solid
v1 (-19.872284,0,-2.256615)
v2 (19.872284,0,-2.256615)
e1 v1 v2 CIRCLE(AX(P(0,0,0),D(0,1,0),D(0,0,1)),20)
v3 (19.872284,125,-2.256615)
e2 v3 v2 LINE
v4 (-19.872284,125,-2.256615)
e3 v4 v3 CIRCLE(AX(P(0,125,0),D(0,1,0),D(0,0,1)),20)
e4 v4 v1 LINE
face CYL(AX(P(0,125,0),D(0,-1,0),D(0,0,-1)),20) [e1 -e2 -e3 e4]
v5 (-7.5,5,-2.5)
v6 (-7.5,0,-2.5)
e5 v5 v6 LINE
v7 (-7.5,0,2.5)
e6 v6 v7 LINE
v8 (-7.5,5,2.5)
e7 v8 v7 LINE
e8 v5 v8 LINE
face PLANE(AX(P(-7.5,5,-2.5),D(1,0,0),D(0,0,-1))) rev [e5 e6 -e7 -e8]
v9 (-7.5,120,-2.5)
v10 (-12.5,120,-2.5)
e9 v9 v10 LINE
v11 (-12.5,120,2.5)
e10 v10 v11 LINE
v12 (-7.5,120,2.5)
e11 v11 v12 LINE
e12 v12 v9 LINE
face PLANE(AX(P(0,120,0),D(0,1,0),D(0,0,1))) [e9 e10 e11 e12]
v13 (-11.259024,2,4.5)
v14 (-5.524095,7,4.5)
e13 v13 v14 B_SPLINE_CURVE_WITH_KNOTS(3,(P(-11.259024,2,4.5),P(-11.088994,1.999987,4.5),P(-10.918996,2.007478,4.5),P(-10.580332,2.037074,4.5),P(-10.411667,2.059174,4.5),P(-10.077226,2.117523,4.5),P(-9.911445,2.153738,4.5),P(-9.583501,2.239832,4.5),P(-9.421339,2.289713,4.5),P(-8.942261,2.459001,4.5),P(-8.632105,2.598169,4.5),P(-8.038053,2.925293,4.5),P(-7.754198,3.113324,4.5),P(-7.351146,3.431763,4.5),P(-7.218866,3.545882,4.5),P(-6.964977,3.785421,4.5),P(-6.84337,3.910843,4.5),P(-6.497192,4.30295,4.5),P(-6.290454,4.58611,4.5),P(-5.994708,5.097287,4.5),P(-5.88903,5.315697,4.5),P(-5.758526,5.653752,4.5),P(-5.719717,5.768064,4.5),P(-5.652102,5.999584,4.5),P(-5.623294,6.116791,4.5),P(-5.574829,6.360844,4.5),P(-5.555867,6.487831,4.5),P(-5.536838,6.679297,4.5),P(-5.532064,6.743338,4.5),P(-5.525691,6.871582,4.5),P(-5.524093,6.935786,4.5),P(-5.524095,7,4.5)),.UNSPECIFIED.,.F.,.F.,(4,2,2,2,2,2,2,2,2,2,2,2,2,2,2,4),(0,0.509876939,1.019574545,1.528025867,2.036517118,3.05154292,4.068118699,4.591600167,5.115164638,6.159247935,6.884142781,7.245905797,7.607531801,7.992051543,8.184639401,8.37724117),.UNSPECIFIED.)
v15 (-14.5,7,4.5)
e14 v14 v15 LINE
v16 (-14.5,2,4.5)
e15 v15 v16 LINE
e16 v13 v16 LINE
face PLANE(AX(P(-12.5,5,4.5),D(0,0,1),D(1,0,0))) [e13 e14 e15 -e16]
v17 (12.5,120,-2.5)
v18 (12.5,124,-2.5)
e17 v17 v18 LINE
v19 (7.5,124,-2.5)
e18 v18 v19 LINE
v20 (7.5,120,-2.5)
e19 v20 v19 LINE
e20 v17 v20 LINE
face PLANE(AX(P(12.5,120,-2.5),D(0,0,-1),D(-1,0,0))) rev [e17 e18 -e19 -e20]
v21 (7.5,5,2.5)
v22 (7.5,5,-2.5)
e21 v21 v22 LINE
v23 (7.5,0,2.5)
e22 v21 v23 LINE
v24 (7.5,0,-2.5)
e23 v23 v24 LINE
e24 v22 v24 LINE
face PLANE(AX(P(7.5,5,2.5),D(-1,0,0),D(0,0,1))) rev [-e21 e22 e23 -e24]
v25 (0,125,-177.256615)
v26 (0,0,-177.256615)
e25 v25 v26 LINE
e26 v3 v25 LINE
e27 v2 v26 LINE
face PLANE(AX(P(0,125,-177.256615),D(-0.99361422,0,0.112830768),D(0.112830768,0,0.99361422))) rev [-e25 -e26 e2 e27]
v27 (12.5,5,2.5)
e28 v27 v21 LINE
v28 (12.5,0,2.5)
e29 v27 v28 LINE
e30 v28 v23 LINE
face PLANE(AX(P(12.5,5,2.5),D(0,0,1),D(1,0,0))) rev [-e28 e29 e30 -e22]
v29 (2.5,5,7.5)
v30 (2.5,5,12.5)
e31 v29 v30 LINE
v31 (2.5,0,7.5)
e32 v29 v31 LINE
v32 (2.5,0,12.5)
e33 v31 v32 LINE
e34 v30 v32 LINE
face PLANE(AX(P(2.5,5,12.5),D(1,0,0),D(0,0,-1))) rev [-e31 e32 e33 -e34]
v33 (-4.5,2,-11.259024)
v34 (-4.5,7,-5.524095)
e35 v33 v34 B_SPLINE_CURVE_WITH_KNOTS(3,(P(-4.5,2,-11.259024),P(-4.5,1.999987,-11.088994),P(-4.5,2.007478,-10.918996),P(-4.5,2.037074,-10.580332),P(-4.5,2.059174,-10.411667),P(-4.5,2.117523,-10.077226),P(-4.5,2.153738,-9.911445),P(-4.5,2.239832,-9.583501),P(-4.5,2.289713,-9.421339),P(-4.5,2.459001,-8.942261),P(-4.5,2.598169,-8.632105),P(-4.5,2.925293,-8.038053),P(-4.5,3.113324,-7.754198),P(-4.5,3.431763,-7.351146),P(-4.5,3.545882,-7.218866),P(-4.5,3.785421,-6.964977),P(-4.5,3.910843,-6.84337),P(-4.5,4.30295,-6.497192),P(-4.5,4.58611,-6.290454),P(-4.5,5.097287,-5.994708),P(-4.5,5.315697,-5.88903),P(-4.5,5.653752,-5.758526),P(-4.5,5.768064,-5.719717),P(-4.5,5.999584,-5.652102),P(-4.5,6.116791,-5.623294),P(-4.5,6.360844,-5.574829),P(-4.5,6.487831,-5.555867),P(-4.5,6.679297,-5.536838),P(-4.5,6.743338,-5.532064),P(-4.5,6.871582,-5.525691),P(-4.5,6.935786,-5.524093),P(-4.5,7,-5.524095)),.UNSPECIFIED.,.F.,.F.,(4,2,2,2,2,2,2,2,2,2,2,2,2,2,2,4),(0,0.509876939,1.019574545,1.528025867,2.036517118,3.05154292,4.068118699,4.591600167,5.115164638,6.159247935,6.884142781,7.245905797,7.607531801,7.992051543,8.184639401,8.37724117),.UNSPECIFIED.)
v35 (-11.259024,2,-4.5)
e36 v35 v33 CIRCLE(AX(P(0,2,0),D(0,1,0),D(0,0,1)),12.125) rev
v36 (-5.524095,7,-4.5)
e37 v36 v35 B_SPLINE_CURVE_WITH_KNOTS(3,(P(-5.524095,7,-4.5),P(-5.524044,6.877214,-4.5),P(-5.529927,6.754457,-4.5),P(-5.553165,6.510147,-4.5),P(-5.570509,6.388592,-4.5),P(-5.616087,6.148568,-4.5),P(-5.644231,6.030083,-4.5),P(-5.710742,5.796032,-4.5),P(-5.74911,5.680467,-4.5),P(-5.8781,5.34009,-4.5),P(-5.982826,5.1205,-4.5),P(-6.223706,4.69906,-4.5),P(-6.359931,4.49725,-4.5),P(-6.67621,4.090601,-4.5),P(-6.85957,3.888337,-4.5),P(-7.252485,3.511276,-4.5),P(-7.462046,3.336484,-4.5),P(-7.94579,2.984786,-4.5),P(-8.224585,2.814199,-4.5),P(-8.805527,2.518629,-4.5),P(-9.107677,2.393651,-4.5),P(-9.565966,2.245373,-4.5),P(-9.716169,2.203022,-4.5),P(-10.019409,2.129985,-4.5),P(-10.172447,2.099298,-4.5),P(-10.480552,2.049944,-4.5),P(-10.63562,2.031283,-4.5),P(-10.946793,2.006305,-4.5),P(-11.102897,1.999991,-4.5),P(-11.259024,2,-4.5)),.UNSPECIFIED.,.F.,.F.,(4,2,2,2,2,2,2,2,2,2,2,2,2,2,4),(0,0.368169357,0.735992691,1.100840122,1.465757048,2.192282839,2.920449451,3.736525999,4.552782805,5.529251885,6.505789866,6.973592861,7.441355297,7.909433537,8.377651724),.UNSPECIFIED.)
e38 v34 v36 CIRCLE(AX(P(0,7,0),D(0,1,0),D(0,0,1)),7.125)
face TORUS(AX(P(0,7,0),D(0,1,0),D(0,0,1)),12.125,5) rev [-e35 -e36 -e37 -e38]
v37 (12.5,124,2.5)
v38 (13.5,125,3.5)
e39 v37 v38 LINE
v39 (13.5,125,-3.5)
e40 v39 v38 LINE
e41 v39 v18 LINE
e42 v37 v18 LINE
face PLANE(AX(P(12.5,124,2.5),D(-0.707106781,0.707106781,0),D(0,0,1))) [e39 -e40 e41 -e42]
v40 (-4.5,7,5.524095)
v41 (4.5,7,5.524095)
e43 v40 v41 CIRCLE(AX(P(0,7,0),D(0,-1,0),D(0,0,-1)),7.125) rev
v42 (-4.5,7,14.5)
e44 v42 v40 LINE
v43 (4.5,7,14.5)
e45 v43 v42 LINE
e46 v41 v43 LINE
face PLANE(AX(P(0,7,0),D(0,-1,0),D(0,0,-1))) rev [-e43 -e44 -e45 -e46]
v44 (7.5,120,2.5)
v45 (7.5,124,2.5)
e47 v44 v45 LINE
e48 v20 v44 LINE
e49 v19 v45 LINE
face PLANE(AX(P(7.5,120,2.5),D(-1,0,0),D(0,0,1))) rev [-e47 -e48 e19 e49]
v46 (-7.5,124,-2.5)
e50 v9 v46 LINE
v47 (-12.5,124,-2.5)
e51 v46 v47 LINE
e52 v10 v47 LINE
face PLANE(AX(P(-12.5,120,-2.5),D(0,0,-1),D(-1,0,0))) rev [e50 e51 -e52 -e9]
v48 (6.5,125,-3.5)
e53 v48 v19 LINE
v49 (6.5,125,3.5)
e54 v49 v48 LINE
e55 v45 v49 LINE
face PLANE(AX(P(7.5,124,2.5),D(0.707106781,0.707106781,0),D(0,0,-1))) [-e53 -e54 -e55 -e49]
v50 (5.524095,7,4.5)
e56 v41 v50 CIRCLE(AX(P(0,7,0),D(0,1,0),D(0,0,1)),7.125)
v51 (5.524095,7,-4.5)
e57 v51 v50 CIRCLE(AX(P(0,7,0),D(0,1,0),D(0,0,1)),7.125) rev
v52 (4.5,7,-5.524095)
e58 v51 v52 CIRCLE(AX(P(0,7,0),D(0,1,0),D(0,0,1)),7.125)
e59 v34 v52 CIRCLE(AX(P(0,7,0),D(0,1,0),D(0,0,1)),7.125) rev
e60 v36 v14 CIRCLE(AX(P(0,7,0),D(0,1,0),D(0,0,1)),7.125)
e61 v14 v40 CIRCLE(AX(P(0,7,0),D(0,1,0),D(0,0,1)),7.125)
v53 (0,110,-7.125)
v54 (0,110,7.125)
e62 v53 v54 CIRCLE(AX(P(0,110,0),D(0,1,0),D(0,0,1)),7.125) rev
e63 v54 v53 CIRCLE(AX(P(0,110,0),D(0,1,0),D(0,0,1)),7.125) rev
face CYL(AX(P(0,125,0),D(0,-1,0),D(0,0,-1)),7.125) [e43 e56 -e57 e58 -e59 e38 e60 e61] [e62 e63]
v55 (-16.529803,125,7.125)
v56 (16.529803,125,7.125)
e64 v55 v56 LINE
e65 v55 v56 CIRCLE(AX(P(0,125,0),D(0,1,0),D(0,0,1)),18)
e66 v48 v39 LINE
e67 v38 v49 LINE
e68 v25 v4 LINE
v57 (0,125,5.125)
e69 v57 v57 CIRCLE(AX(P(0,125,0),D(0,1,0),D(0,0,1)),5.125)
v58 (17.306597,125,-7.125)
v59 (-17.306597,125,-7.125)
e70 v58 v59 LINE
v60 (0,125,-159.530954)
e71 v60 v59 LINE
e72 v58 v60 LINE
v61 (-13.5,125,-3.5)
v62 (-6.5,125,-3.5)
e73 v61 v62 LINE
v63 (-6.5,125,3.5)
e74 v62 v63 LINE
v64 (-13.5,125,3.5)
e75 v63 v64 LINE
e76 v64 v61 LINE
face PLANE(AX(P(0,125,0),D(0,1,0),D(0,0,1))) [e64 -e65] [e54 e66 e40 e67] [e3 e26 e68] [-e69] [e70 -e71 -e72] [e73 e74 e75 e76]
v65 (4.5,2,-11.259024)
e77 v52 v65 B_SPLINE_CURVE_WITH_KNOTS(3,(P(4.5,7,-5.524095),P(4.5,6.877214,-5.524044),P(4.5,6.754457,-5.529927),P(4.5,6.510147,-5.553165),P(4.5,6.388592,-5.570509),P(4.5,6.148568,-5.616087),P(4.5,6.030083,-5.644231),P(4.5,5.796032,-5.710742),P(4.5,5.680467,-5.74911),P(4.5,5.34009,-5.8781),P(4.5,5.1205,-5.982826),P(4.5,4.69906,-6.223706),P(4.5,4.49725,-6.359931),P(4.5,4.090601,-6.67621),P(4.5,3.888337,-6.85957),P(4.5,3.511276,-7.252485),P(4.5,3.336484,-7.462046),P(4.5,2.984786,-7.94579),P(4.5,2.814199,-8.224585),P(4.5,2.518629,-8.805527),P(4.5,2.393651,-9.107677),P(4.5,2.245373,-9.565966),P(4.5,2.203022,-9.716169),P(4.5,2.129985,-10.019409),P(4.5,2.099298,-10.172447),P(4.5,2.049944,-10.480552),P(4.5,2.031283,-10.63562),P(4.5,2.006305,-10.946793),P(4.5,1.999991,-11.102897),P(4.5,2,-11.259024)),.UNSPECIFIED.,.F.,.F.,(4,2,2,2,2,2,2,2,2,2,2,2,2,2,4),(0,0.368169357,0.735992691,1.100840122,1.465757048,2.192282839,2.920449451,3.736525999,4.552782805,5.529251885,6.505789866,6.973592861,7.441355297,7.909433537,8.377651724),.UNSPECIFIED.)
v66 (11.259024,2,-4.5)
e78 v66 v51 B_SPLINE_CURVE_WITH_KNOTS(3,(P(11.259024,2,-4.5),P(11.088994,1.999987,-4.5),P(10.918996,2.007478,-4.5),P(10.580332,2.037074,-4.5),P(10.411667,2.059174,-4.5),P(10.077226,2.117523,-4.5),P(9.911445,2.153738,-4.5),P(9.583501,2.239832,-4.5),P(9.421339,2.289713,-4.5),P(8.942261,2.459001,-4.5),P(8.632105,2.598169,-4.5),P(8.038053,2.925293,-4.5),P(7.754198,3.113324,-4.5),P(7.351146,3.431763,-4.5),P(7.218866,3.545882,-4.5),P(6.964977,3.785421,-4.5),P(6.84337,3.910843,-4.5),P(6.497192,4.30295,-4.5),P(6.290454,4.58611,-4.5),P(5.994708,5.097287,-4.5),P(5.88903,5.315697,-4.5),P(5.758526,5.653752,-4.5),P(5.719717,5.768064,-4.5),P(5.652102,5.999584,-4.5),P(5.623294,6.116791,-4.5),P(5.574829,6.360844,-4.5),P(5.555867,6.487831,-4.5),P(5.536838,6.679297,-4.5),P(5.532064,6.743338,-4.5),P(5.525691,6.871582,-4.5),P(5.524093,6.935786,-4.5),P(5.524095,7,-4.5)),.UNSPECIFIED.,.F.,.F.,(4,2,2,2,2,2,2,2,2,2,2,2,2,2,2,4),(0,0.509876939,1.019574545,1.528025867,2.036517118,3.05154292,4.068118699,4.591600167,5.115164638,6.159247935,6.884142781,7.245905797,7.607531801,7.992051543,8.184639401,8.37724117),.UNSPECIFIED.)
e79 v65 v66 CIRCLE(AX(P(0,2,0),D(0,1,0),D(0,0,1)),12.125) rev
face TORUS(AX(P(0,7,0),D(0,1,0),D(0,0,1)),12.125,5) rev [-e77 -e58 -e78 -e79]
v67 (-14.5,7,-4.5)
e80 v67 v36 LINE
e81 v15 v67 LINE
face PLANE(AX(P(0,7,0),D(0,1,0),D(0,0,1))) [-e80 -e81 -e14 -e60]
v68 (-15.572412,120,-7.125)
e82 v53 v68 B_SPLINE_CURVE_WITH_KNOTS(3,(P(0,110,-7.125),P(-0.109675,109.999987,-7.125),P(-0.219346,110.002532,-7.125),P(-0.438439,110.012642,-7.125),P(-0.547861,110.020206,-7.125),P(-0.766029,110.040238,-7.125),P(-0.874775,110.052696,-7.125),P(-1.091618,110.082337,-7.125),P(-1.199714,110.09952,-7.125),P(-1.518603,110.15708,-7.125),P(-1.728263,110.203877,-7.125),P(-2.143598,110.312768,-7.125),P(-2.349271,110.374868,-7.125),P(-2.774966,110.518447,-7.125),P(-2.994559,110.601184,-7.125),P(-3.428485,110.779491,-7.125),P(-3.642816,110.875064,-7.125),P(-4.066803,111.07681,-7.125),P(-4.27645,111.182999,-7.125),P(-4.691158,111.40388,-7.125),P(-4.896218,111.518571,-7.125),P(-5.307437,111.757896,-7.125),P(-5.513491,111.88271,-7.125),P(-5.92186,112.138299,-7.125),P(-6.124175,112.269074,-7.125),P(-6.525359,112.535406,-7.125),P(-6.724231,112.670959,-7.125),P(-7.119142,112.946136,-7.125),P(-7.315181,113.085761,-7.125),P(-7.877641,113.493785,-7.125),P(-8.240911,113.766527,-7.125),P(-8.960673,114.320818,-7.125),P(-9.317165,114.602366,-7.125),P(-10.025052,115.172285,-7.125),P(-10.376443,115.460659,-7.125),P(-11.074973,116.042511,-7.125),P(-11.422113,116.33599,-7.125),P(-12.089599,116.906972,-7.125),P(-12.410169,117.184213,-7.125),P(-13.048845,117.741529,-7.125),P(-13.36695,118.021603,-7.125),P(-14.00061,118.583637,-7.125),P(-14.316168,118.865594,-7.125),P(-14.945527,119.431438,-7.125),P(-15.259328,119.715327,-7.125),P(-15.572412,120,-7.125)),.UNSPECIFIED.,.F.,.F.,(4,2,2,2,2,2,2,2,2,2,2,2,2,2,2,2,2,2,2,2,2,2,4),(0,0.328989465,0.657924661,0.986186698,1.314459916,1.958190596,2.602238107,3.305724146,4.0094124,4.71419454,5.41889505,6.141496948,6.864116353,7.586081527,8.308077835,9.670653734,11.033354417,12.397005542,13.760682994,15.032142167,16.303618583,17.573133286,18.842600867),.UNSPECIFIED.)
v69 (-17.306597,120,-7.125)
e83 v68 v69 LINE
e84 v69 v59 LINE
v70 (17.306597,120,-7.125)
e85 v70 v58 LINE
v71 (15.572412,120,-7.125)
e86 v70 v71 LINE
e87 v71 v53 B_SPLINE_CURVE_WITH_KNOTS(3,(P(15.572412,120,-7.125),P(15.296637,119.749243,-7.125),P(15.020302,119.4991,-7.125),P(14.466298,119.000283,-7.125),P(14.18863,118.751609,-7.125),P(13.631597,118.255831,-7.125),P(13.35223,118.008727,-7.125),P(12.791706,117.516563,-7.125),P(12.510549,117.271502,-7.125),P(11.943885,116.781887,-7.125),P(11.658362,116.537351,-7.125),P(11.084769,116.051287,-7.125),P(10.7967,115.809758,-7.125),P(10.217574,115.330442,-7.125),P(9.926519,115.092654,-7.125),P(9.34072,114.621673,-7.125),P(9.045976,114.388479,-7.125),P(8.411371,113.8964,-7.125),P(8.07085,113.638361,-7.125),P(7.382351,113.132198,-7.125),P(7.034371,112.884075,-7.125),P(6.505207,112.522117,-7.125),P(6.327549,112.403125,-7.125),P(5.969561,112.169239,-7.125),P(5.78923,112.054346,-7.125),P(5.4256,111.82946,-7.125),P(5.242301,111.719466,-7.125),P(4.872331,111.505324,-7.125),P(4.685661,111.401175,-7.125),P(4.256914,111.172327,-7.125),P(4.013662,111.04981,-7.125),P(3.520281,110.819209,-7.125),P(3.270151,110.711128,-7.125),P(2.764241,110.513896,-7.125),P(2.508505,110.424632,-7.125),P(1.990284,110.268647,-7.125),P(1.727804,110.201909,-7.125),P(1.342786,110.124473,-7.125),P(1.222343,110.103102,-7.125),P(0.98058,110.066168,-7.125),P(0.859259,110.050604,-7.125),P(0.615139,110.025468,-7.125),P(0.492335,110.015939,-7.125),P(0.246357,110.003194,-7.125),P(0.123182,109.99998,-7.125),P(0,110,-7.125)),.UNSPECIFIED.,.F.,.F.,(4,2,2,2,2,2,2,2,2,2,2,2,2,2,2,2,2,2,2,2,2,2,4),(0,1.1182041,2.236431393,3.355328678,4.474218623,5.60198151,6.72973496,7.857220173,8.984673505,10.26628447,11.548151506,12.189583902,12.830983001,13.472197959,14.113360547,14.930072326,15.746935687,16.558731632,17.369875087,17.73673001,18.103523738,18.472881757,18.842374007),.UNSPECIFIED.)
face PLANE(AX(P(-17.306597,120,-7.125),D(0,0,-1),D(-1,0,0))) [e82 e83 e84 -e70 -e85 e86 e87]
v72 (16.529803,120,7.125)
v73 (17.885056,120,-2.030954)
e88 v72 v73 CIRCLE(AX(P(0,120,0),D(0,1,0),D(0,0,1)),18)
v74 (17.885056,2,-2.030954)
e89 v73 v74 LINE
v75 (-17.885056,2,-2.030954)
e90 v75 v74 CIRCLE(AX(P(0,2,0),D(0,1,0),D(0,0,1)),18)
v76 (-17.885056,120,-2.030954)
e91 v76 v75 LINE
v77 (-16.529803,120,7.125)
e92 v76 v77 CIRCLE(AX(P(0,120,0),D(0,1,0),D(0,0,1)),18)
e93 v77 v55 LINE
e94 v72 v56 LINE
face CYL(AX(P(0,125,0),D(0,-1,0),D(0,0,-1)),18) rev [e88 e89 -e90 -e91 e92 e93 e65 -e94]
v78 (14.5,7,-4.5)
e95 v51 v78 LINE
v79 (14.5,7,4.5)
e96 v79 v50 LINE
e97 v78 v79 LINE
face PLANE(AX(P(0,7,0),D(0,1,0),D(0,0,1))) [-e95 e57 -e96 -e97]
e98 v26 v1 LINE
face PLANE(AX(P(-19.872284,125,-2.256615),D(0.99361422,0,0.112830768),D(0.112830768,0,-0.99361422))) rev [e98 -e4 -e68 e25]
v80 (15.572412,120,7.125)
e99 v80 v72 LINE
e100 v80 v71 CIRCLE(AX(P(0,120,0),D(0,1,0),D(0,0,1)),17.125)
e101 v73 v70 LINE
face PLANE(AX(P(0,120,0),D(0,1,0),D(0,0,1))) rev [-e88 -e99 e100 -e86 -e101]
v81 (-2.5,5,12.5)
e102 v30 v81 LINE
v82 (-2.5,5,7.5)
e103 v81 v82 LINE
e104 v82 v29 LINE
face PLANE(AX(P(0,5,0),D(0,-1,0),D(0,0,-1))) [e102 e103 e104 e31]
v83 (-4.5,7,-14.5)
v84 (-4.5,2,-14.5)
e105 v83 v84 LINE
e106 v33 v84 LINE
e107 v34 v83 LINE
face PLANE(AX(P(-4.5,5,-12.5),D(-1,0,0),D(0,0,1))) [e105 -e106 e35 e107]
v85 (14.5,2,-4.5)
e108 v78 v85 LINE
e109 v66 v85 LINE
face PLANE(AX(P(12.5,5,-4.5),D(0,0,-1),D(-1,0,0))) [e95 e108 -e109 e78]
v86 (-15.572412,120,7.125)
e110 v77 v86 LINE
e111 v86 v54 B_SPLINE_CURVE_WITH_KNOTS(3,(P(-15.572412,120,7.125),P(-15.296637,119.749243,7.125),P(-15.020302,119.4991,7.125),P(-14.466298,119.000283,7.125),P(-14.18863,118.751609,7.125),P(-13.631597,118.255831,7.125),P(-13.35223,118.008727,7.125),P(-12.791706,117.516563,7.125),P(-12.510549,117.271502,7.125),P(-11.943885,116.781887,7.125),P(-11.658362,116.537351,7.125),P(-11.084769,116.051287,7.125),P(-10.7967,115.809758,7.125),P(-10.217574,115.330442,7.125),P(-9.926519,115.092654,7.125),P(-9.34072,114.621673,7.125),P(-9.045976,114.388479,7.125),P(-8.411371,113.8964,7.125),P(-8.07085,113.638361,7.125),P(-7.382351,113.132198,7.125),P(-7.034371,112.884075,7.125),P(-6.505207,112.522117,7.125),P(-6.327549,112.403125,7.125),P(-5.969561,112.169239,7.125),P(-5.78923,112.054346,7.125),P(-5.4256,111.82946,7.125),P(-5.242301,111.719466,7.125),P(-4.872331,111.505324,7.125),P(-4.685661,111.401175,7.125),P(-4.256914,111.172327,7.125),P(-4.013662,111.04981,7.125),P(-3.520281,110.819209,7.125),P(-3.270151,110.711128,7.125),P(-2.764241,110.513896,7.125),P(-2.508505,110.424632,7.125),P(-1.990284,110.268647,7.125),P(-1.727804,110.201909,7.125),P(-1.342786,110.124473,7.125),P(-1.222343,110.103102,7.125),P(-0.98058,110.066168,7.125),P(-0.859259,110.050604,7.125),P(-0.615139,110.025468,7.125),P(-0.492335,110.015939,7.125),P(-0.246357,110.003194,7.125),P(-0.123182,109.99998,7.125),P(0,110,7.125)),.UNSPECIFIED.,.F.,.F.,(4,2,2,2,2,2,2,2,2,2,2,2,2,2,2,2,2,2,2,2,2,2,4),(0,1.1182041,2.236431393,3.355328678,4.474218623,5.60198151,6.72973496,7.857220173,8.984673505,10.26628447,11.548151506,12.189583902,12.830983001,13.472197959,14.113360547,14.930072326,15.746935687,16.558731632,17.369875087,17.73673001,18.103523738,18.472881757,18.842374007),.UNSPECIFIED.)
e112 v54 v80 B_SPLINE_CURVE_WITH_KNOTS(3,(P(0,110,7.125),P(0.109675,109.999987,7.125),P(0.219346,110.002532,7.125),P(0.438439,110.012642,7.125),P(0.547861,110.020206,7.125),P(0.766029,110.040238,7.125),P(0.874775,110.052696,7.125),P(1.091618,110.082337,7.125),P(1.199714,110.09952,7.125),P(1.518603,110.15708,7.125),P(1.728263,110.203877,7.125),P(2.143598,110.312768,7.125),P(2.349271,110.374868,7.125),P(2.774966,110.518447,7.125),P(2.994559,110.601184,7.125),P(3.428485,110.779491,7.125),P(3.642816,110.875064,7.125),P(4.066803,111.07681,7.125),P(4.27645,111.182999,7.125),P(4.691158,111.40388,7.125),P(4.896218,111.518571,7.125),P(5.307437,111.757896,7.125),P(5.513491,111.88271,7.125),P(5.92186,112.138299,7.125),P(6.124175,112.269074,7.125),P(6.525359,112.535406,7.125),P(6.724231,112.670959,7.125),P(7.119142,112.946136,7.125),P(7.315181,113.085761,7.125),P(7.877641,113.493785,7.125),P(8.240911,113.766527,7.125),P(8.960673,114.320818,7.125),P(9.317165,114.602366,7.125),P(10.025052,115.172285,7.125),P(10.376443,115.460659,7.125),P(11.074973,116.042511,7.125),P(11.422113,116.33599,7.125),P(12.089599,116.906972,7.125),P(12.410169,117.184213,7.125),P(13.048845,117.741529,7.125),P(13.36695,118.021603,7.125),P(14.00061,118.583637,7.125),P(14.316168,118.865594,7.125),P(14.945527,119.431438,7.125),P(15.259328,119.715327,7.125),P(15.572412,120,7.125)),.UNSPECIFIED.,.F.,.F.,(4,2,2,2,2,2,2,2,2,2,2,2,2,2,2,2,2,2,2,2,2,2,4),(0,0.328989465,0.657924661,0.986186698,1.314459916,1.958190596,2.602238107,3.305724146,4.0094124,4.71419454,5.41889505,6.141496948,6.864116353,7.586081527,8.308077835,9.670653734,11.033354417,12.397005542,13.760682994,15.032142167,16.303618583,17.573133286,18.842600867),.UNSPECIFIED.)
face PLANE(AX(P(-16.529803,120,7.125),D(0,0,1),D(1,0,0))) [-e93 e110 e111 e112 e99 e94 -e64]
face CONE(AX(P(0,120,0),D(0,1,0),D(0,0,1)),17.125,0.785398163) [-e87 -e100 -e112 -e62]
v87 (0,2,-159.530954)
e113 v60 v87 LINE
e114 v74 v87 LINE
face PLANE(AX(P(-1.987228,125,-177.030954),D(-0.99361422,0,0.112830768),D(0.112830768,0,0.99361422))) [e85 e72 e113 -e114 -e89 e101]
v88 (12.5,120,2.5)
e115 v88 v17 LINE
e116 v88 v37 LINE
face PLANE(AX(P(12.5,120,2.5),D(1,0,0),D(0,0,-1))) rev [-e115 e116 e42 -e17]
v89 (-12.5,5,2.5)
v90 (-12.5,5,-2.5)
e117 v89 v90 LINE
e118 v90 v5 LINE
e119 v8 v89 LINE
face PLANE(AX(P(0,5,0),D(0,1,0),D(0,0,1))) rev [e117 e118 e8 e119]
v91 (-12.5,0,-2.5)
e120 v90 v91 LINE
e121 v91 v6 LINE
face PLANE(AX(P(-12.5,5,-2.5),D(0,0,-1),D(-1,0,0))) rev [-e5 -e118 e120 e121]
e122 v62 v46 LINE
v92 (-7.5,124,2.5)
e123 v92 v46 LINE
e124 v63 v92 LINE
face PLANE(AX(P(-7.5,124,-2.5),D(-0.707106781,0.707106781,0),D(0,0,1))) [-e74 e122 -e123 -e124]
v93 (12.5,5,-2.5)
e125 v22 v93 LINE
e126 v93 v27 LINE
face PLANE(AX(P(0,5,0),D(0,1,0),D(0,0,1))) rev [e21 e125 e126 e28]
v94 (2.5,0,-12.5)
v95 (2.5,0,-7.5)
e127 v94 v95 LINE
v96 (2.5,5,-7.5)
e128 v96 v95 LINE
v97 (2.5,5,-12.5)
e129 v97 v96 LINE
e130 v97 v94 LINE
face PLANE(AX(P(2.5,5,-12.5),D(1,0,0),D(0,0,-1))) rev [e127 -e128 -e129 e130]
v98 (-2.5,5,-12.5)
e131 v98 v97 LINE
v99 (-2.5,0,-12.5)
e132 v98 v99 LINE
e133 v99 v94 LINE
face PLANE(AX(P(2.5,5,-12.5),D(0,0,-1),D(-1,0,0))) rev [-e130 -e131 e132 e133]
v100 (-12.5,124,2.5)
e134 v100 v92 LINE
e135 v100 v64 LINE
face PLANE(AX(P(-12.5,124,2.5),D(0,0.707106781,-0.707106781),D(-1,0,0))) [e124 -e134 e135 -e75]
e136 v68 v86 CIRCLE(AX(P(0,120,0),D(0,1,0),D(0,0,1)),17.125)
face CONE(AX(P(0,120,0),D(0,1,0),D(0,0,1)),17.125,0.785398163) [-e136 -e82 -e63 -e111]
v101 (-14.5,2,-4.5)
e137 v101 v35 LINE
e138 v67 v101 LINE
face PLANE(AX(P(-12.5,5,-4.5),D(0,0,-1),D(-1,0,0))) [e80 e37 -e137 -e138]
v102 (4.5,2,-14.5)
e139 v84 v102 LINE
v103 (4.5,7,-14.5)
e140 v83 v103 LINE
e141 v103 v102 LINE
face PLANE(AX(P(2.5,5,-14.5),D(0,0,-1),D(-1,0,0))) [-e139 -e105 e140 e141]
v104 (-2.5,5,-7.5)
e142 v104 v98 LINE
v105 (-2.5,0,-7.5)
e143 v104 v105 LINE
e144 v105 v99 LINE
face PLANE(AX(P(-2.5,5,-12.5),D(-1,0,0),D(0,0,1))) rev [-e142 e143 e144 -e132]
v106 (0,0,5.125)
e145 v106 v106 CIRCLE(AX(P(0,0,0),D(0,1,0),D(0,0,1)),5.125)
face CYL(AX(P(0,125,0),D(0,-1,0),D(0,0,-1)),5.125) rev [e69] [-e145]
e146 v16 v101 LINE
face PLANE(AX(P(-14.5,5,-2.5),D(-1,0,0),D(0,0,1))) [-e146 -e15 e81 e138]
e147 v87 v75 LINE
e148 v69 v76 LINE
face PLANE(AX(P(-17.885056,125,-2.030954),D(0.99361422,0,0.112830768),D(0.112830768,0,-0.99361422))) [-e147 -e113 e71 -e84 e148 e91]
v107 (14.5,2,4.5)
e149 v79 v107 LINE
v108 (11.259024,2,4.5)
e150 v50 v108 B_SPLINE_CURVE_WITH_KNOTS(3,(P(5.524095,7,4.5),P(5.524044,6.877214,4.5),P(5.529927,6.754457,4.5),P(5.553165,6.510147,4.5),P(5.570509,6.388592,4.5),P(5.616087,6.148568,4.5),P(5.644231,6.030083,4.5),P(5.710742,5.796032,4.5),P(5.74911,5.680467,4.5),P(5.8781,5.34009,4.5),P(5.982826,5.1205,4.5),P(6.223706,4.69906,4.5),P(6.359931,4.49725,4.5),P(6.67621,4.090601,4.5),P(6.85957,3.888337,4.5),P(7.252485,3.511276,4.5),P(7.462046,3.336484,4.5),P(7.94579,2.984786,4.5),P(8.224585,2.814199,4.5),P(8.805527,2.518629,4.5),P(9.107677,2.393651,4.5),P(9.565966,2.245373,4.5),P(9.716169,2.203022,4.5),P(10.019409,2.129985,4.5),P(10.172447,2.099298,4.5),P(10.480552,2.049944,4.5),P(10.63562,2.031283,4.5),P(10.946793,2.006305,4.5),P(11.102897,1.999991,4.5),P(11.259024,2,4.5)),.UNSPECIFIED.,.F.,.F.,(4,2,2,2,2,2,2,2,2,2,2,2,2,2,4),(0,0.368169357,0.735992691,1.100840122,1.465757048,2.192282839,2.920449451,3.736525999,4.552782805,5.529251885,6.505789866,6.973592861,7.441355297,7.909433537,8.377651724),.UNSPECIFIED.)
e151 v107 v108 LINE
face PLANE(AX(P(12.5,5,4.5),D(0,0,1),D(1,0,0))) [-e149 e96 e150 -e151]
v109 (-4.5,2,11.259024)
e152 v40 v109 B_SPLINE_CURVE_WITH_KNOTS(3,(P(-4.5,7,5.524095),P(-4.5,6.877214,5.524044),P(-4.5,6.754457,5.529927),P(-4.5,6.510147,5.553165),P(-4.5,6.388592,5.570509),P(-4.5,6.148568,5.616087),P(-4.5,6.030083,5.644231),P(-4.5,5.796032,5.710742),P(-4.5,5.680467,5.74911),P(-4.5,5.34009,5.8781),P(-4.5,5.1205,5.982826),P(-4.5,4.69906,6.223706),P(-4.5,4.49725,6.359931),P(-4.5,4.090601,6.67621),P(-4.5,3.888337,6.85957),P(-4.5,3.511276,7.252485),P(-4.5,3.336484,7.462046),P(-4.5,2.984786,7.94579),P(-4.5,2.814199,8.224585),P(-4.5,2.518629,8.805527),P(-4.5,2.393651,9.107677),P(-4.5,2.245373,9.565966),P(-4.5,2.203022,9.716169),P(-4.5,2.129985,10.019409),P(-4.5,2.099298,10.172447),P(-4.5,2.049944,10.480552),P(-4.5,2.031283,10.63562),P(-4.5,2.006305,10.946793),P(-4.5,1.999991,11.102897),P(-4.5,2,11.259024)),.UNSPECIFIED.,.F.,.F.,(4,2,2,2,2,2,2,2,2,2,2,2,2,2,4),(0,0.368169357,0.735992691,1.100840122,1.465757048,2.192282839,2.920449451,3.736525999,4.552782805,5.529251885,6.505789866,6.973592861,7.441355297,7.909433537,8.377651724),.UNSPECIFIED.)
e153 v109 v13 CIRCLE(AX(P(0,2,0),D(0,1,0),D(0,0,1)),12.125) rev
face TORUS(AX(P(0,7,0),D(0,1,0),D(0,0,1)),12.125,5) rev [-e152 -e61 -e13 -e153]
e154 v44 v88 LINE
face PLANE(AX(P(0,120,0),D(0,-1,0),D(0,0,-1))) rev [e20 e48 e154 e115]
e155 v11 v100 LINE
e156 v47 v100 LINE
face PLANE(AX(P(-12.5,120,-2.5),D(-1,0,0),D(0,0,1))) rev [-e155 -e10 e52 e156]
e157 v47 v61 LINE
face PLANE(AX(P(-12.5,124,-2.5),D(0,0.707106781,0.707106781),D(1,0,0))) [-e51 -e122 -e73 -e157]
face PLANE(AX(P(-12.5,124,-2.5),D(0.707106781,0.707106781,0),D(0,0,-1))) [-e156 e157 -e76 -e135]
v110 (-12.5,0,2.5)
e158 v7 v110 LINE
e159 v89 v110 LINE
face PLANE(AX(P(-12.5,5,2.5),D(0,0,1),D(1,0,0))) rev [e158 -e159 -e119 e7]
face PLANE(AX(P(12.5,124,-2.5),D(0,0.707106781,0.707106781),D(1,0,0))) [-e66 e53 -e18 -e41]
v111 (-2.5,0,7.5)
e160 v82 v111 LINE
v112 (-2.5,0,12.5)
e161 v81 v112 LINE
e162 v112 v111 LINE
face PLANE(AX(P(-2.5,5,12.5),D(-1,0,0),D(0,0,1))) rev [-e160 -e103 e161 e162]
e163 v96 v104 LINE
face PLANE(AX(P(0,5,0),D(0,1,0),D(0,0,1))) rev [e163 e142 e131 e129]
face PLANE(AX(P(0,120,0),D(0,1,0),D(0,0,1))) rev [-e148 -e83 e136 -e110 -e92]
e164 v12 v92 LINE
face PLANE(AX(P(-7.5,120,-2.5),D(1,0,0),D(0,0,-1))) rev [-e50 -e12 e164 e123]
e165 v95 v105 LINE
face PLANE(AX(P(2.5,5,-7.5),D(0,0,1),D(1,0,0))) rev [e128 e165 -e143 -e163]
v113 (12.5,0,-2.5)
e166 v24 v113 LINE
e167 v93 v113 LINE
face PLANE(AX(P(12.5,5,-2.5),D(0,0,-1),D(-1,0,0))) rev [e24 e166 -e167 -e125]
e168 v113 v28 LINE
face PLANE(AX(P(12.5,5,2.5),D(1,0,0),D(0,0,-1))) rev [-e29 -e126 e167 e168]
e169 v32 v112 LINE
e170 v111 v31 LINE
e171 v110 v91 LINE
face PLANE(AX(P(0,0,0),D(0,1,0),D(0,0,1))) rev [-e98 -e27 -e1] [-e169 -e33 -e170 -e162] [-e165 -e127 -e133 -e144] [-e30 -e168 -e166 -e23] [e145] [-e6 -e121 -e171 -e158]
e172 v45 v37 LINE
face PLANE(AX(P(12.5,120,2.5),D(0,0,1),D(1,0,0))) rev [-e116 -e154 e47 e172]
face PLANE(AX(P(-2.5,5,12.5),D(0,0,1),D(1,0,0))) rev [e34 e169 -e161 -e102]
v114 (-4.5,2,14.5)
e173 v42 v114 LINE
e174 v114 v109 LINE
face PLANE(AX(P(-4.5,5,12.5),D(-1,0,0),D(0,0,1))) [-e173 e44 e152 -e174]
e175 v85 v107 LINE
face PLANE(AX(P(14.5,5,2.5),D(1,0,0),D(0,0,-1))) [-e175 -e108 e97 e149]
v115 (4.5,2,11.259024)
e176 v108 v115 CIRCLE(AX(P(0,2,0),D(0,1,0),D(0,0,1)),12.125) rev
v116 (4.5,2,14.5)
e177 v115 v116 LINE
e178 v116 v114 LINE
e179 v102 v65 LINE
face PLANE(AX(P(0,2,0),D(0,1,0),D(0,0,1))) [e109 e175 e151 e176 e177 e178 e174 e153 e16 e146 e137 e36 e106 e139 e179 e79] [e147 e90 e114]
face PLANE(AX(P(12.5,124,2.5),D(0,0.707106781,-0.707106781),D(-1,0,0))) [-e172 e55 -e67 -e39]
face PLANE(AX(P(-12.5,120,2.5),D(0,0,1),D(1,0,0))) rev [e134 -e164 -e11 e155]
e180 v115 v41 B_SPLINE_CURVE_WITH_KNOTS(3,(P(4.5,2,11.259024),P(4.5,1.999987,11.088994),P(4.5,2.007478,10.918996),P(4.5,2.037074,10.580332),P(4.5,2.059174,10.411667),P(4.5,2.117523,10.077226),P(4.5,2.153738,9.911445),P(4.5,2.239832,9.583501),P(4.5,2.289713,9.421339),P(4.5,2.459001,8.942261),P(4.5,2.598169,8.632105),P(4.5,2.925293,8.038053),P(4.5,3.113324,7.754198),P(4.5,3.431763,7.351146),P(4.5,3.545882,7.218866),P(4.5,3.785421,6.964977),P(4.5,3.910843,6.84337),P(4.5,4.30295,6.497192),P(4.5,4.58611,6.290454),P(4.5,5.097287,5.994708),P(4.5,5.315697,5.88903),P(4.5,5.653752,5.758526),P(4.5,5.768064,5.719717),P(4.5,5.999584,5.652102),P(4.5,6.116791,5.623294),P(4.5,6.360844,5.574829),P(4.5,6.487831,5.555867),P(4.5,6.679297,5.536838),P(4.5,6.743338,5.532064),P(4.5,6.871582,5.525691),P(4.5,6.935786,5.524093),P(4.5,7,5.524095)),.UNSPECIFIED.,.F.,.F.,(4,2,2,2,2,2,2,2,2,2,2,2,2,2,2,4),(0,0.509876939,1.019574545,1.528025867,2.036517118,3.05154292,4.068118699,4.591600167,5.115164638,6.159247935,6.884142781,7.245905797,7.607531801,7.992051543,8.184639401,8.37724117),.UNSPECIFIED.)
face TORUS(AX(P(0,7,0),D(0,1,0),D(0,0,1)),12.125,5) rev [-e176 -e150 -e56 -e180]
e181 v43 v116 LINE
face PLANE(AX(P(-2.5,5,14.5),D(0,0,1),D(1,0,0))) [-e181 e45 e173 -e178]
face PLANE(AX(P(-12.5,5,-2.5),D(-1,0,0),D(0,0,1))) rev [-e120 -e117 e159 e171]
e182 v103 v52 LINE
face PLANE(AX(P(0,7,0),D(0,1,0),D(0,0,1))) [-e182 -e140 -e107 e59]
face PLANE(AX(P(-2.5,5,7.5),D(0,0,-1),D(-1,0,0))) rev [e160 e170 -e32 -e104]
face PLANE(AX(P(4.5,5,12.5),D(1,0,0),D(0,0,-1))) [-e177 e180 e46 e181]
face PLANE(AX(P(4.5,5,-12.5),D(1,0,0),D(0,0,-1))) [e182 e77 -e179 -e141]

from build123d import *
from build123d.topology import SkipClean

# Parameters (mm, degrees)
SKETCH1_R           = 5.125
BOSS_EXTRUDE1_DEPTH = 125
SKETCH2_W           = 5
SKETCH2_H           = 5
CUT_EXTRUDE1_DEPTH  = 5
SHELL1_START        = 7
SHELL1_OUTLINE_R    = 7.125
SHELL1_DEPTH        = 118
SHELL1_START_2      = 2
SHELL1_2_DEPTH      = 5
FILLET1_R           = 5
BOSS_EXTRUDE2_START = -5
SKETCH3_R           = 5.125
BOSS_EXTRUDE2_DEPTH = 5
CHAMFER1_SIZE       = 10
SKETCH5_W           = 5
SKETCH5_H           = 5
CUT_EXTRUDE3_DEPTH  = 5
CHAMFER2_SIZE       = 1


# Read off the part's stored shape, not the designer's step: Shell1
# Some blends are built 0.0001 mm under size
with BuildPart() as part:
    # Sketch1 → Boss-Extrude1 (new body)
    with BuildSketch(Plane(origin=(0, 0, 0), x_dir=(1, 0, 0), z_dir=(0, 1, 0))):
        with BuildLine():
            Line((-19.872284, 2.256615), (0, 177.256615))
            Line((0, 177.256615), (19.872284, 2.256615))
            ThreePointArc((19.872284, 2.256615), (0, -20), (-19.872284, 2.256615))
        make_face()
        with Locations(Location((0, 0, 0), (0, 0, 270))):
            Circle(SKETCH1_R, mode=Mode.SUBTRACT)
    extrude(amount=BOSS_EXTRUDE1_DEPTH)

    # Sketch2 → Cut-Extrude1 (cut)
    with BuildSketch(Plane.XZ):
        with Locations((10, 0)):
            Rectangle(SKETCH2_W, SKETCH2_H)
        with Locations((0, 10)):
            Rectangle(SKETCH2_W, SKETCH2_H)
        with Locations((0, -10)):
            Rectangle(SKETCH2_W, SKETCH2_H)
        with Locations((-10, 0)):
            Rectangle(SKETCH2_W, SKETCH2_H)
    extrude(amount=-CUT_EXTRUDE1_DEPTH, mode=Mode.SUBTRACT)

    # Shell1 outline → Shell1 (cut)
    with BuildSketch(Plane(origin=(0, 0, 0), x_dir=(1, 0, 0), z_dir=(0, 1, 0)).offset(SHELL1_START)):
        with BuildLine():
            ThreePointArc((-17.885056, 2.030954), (0, -18), (17.885056, 2.030954))
            Line((17.885056, 2.030954), (0, 159.530954))
            Line((0, 159.530954), (-17.885056, 2.030954))
        make_face()
        Circle(SHELL1_OUTLINE_R, mode=Mode.SUBTRACT)
    extrude(amount=SHELL1_DEPTH, mode=Mode.SUBTRACT)

    # Shell1 2 outline → Shell1 2 (cut)
    with SkipClean():  # the faces are left unmerged after this step: merging them gives an invalid solid
        with BuildSketch(Plane(origin=(0, 0, 0), x_dir=(1, 0, 0), z_dir=(0, 1, 0)).offset(SHELL1_START_2)):
            with BuildLine():
                ThreePointArc((-17.885056, 2.030954), (0, -18), (17.885056, 2.030954))
                Line((17.885056, 2.030954), (0, 159.530954))
                Line((0, 159.530954), (-17.885056, 2.030954))
            make_face()
            with BuildLine():
                ThreePointArc((4.5, 5.524095), (5.038136, 5.038136), (5.524095, 4.5))
                Line((5.524095, 4.5), (14.5, 4.5))
                Line((14.5, 4.5), (14.5, -4.5))
                Line((14.5, -4.5), (5.524095, -4.5))
                ThreePointArc((5.524095, -4.5), (5.038136, -5.038136), (4.5, -5.524095))
                Line((4.5, -5.524095), (4.5, -14.5))
                Line((4.5, -14.5), (-4.5, -14.5))
                Line((-4.5, -14.5), (-4.5, -5.524095))
                ThreePointArc((-4.5, -5.524095), (-5.038136, -5.038136), (-5.524095, -4.5))
                Line((-5.524095, -4.5), (-14.5, -4.5))
                Line((-14.5, -4.5), (-14.5, 4.5))
                Line((-14.5, 4.5), (-5.524095, 4.5))
                ThreePointArc((-5.524095, 4.5), (-5.038136, 5.038136), (-4.5, 5.524095))
                Line((-4.5, 5.524095), (-4.5, 14.5))
                Line((-4.5, 14.5), (4.5, 14.5))
                Line((4.5, 14.5), (4.5, 5.524095))
            make_face(mode=Mode.SUBTRACT)
        extrude(amount=SHELL1_2_DEPTH, mode=Mode.SUBTRACT)

    # Fillet1
    fillet1_edges = [part.edges().sort_by_distance(p)[0] for p in [
        (5.038136, 2, 5.038136),
        (-5.038136, 2, 5.038136),
        (-5.038136, 2, -5.038136),
        (5.038136, 2, -5.038136),
    ]]
    fillet(fillet1_edges, radius=FILLET1_R - 0.0001)  # a hair under: the kernel refuses the full size

    # Sketch3 → Boss-Extrude2 (add)
    with SkipClean():  # the faces are left unmerged after this step: merging them gives an invalid solid
        with BuildSketch(Plane(origin=(0, 125, 0), x_dir=(1, 0, 0), z_dir=(0, 1, 0)).offset(BOSS_EXTRUDE2_START)):
            with BuildLine():
                Line((-16.529803, -7.125), (16.529803, -7.125))
                ThreePointArc((16.529803, -7.125), (17.805996, -2.635622), (17.885056, 2.030954))
                Line((17.885056, 2.030954), (17.306597, 7.125))
                Line((17.306597, 7.125), (-17.306597, 7.125))
                Line((-17.306597, 7.125), (-17.885056, 2.030954))
                ThreePointArc((-17.885056, 2.030954), (-17.805996, -2.635622), (-16.529803, -7.125))
            make_face()
            with Locations(Location((0, 0, 0), (0, 0, 270))):
                Circle(SKETCH3_R, mode=Mode.SUBTRACT)
        extrude(amount=BOSS_EXTRUDE2_DEPTH)

    # Chamfer1
    # the kernel refuses this chamfer: 10 mm, written as the material it adds along each edge
    with BuildSketch(Plane(origin=(0, 120, 0), x_dir=(1, 0, 0), z_dir=(0, 0, -1))) as chamfer1_piece_1_section:
        Polygon((7.125 + CHAMFER1_SIZE, 0), (7.125, CHAMFER1_SIZE), (7.125, 0), align=None)
    chamfer1_piece_1 = revolve(axis=Axis((0, 120, 0), (0, -1, 0)), revolution_arc=90, mode=Mode.PRIVATE)
    chamfer1_piece_1 = split(chamfer1_piece_1, bisect_by=Plane(origin=(9.148116, 116.581472, 7.125), z_dir=(0, 0, -1)), keep=Keep.TOP, mode=Mode.PRIVATE)
    add(chamfer1_piece_1)
    with BuildSketch(Plane(origin=(0, 120, 0), x_dir=(0, 0, 1), z_dir=(1, 0, 0))) as chamfer1_piece_2_section:
        Polygon((7.125 + CHAMFER1_SIZE, 0), (7.125, CHAMFER1_SIZE), (7.125, 0), align=None)
    chamfer1_piece_2 = revolve(axis=Axis((0, 120, 0), (0, -1, 0)), revolution_arc=180, mode=Mode.PRIVATE)
    chamfer1_piece_2 = split(chamfer1_piece_2, bisect_by=Plane(origin=(-9.148116, 116.581472, 7.125), z_dir=(0, 0, -1)), keep=Keep.TOP, mode=Mode.PRIVATE)
    chamfer1_piece_2 = split(chamfer1_piece_2, bisect_by=Plane(origin=(-9.148116, 116.581472, -7.125), z_dir=(0, 0, 1)), keep=Keep.TOP, mode=Mode.PRIVATE)
    add(chamfer1_piece_2)
    with BuildSketch(Plane(origin=(0, 120, 0), x_dir=(0, 0, -1), z_dir=(-1, 0, 0))) as chamfer1_piece_3_section:
        Polygon((7.125 + CHAMFER1_SIZE, 0), (7.125, CHAMFER1_SIZE), (7.125, 0), align=None)
    chamfer1_piece_3 = revolve(axis=Axis((0, 120, 0), (0, -1, 0)), revolution_arc=90, mode=Mode.PRIVATE)
    chamfer1_piece_3 = split(chamfer1_piece_3, bisect_by=Plane(origin=(9.148116, 116.581472, -7.125), z_dir=(0, 0, 1)), keep=Keep.TOP, mode=Mode.PRIVATE)
    add(chamfer1_piece_3)

    # Sketch5 → Cut-Extrude3 (cut)
    with BuildSketch(Plane(origin=(0, 125, 0), x_dir=(1, 0, 0), z_dir=(0, 1, 0))):
        with Locations((10, 0)):
            Rectangle(SKETCH5_W, SKETCH5_H)
        with Locations((-10, 0)):
            Rectangle(SKETCH5_W, SKETCH5_H)
    extrude(amount=-CUT_EXTRUDE3_DEPTH, mode=Mode.SUBTRACT)

    # Chamfer2
    # the kernel refuses this chamfer: 1 mm, written as the material it takes off along each edge
    with BuildSketch(Plane(origin=(-7.5, 125, -2.5), x_dir=(0.999621916911297, 0.027495876610582174, 0), z_dir=(0, 0, 1)), Plane(origin=(-12.5, 125, -2.5), x_dir=(0, 0.02749587661058217, -0.9996219169112968), z_dir=(1, 0, 0)), Plane(origin=(-12.5, 125, 2.5), x_dir=(-0.999621916911297, 0.0274958766105822, 0), z_dir=(0, 0, -1)), Plane(origin=(-7.5, 125, 2.5), x_dir=(0, 0.02749587661058217, 0.9996219169112968), z_dir=(-1, 0, 0))) as chamfer2_piece_1:
        Polygon((CHAMFER2_SIZE * 0.999621916911, -CHAMFER2_SIZE * 0.0274958766106), (-CHAMFER2_SIZE * 0.0274958766106, -CHAMFER2_SIZE * 0.999621916911), (0, 0), align=None)
    extrude(amount=5, mode=Mode.SUBTRACT)
    with BuildSketch(Plane(origin=(12.5, 125, -2.5), x_dir=(0, 0.02749587661058217, -0.9996219169112968), z_dir=(-1, 0, 0)), Plane(origin=(7.5, 125, -2.5), x_dir=(-0.999621916911297, 0.027495876610582174, 0), z_dir=(0, 0, 1)), Plane(origin=(7.5, 125, 2.5), x_dir=(0, 0.02749587661058217, 0.9996219169112968), z_dir=(1, 0, 0)), Plane(origin=(12.5, 125, 2.5), x_dir=(0.999621916911297, 0.0274958766105822, 0), z_dir=(0, 0, -1))) as chamfer2_piece_2:
        Polygon((CHAMFER2_SIZE * 0.999621916911, CHAMFER2_SIZE * 0.0274958766106), (-CHAMFER2_SIZE * 0.0274958766106, CHAMFER2_SIZE * 0.999621916911), (0, 0), align=None)
    extrude(amount=5, mode=Mode.SUBTRACT)
    with BuildSketch(Plane(origin=(-7.5, 125, -5.071683), x_dir=(0.999621916911297, 0.027495876610582174, 0), z_dir=(0, 0, 1))) as chamfer2_piece_3a_section:
        Polygon((CHAMFER2_SIZE * 0.999621916911, -CHAMFER2_SIZE * 0.0274958766106), (-CHAMFER2_SIZE * 0.0274958766106, -CHAMFER2_SIZE * 0.999621916911), (0, 0), align=None)
    chamfer2_piece_3a = extrude(amount=7.571683, mode=Mode.PRIVATE)
    chamfer2_piece_3a = split(chamfer2_piece_3a, bisect_by=Plane(origin=(-7.170206, 124.670206, -2.5), z_dir=(0, 0, -1)), keep=Keep.TOP, mode=Mode.PRIVATE)
    with BuildSketch(Plane(origin=(-12.5, 125, -2.5), x_dir=(0, 0.02749587661058217, -0.9996219169112968), z_dir=(1, 0, 0))) as chamfer2_piece_3b_section:
        Polygon((CHAMFER2_SIZE * 0.999621916911, -CHAMFER2_SIZE * 0.0274958766106), (-CHAMFER2_SIZE * 0.0274958766106, -CHAMFER2_SIZE * 0.999621916911), (0, 0), align=None)
    chamfer2_piece_3b = extrude(amount=7.571683, mode=Mode.PRIVATE)
    chamfer2_piece_3b = split(chamfer2_piece_3b, bisect_by=Plane(origin=(-7.5, 124.670206, -2.829794), z_dir=(1, 0, 0)), keep=Keep.TOP, mode=Mode.PRIVATE)
    chamfer2_piece_3 = chamfer2_piece_3a & chamfer2_piece_3b
    add(chamfer2_piece_3, mode=Mode.SUBTRACT)
    with BuildSketch(Plane(origin=(-4.928317, 125, 2.5), x_dir=(0, 0.02749587661058217, 0.9996219169112968), z_dir=(-1, 0, 0))) as chamfer2_piece_4a_section:
        Polygon((CHAMFER2_SIZE * 0.999621916911, -CHAMFER2_SIZE * 0.0274958766106), (-CHAMFER2_SIZE * 0.0274958766106, -CHAMFER2_SIZE * 0.999621916911), (0, 0), align=None)
    chamfer2_piece_4a = extrude(amount=7.571683, mode=Mode.PRIVATE)
    chamfer2_piece_4a = split(chamfer2_piece_4a, bisect_by=Plane(origin=(-7.5, 124.670206, 2.829794), z_dir=(1, 0, 0)), keep=Keep.TOP, mode=Mode.PRIVATE)
    with BuildSketch(Plane(origin=(-7.5, 125, -2.5), x_dir=(0.999621916911297, 0.027495876610582174, 0), z_dir=(0, 0, 1))) as chamfer2_piece_4b_section:
        Polygon((CHAMFER2_SIZE * 0.999621916911, -CHAMFER2_SIZE * 0.0274958766106), (-CHAMFER2_SIZE * 0.0274958766106, -CHAMFER2_SIZE * 0.999621916911), (0, 0), align=None)
    chamfer2_piece_4b = extrude(amount=7.571683, mode=Mode.PRIVATE)
    chamfer2_piece_4b = split(chamfer2_piece_4b, bisect_by=Plane(origin=(-7.170206, 124.670206, 2.5), z_dir=(0, 0, 1)), keep=Keep.TOP, mode=Mode.PRIVATE)
    chamfer2_piece_4 = chamfer2_piece_4a & chamfer2_piece_4b
    add(chamfer2_piece_4, mode=Mode.SUBTRACT)
    with BuildSketch(Plane(origin=(-12.5, 125, 2.5), x_dir=(-0.999621916911297, 0.0274958766105822, 0), z_dir=(0, 0, -1))) as chamfer2_piece_5a_section:
        Polygon((CHAMFER2_SIZE * 0.999621916911, -CHAMFER2_SIZE * 0.0274958766106), (-CHAMFER2_SIZE * 0.0274958766106, -CHAMFER2_SIZE * 0.999621916911), (0, 0), align=None)
    chamfer2_piece_5a = extrude(amount=7.571683, mode=Mode.PRIVATE)
    chamfer2_piece_5a = split(chamfer2_piece_5a, bisect_by=Plane(origin=(-12.829794, 124.670206, -2.5), z_dir=(0, 0, -1)), keep=Keep.TOP, mode=Mode.PRIVATE)
    with BuildSketch(Plane(origin=(-15.071683, 125, -2.5), x_dir=(0, 0.02749587661058217, -0.9996219169112968), z_dir=(1, 0, 0))) as chamfer2_piece_5b_section:
        Polygon((CHAMFER2_SIZE * 0.999621916911, -CHAMFER2_SIZE * 0.0274958766106), (-CHAMFER2_SIZE * 0.0274958766106, -CHAMFER2_SIZE * 0.999621916911), (0, 0), align=None)
    chamfer2_piece_5b = extrude(amount=7.571683, mode=Mode.PRIVATE)
    chamfer2_piece_5b = split(chamfer2_piece_5b, bisect_by=Plane(origin=(-12.5, 124.670206, -2.829794), z_dir=(-1, 0, 0)), keep=Keep.TOP, mode=Mode.PRIVATE)
    chamfer2_piece_5 = chamfer2_piece_5a & chamfer2_piece_5b
    add(chamfer2_piece_5, mode=Mode.SUBTRACT)
    with BuildSketch(Plane(origin=(-12.5, 125, 5.071683), x_dir=(-0.999621916911297, 0.0274958766105822, 0), z_dir=(0, 0, -1))) as chamfer2_piece_6a_section:
        Polygon((CHAMFER2_SIZE * 0.999621916911, -CHAMFER2_SIZE * 0.0274958766106), (-CHAMFER2_SIZE * 0.0274958766106, -CHAMFER2_SIZE * 0.999621916911), (0, 0), align=None)
    chamfer2_piece_6a = extrude(amount=7.571683, mode=Mode.PRIVATE)
    chamfer2_piece_6a = split(chamfer2_piece_6a, bisect_by=Plane(origin=(-12.829794, 124.670206, 2.5), z_dir=(0, 0, 1)), keep=Keep.TOP, mode=Mode.PRIVATE)
    with BuildSketch(Plane(origin=(-7.5, 125, 2.5), x_dir=(0, 0.02749587661058217, 0.9996219169112968), z_dir=(-1, 0, 0))) as chamfer2_piece_6b_section:
        Polygon((CHAMFER2_SIZE * 0.999621916911, -CHAMFER2_SIZE * 0.0274958766106), (-CHAMFER2_SIZE * 0.0274958766106, -CHAMFER2_SIZE * 0.999621916911), (0, 0), align=None)
    chamfer2_piece_6b = extrude(amount=7.571683, mode=Mode.PRIVATE)
    chamfer2_piece_6b = split(chamfer2_piece_6b, bisect_by=Plane(origin=(-12.5, 124.670206, 2.829794), z_dir=(-1, 0, 0)), keep=Keep.TOP, mode=Mode.PRIVATE)
    chamfer2_piece_6 = chamfer2_piece_6a & chamfer2_piece_6b
    add(chamfer2_piece_6, mode=Mode.SUBTRACT)
    with BuildSketch(Plane(origin=(12.5, 125, 2.5), x_dir=(0.999621916911297, 0.0274958766105822, 0), z_dir=(0, 0, -1))) as chamfer2_piece_7a_section:
        Polygon((CHAMFER2_SIZE * 0.999621916911, CHAMFER2_SIZE * 0.0274958766106), (-CHAMFER2_SIZE * 0.0274958766106, CHAMFER2_SIZE * 0.999621916911), (0, 0), align=None)
    chamfer2_piece_7a = extrude(amount=7.571683, mode=Mode.PRIVATE)
    chamfer2_piece_7a = split(chamfer2_piece_7a, bisect_by=Plane(origin=(12.829794, 124.670206, -2.5), z_dir=(0, 0, -1)), keep=Keep.TOP, mode=Mode.PRIVATE)
    with BuildSketch(Plane(origin=(15.071683, 125, -2.5), x_dir=(0, 0.02749587661058217, -0.9996219169112968), z_dir=(-1, 0, 0))) as chamfer2_piece_7b_section:
        Polygon((CHAMFER2_SIZE * 0.999621916911, CHAMFER2_SIZE * 0.0274958766106), (-CHAMFER2_SIZE * 0.0274958766106, CHAMFER2_SIZE * 0.999621916911), (0, 0), align=None)
    chamfer2_piece_7b = extrude(amount=7.571683, mode=Mode.PRIVATE)
    chamfer2_piece_7b = split(chamfer2_piece_7b, bisect_by=Plane(origin=(12.5, 124.670206, -2.829794), z_dir=(1, 0, 0)), keep=Keep.TOP, mode=Mode.PRIVATE)
    chamfer2_piece_7 = chamfer2_piece_7a & chamfer2_piece_7b
    add(chamfer2_piece_7, mode=Mode.SUBTRACT)
    with BuildSketch(Plane(origin=(12.5, 125, -2.5), x_dir=(0, 0.02749587661058217, -0.9996219169112968), z_dir=(-1, 0, 0))) as chamfer2_piece_8a_section:
        Polygon((CHAMFER2_SIZE * 0.999621916911, CHAMFER2_SIZE * 0.0274958766106), (-CHAMFER2_SIZE * 0.0274958766106, CHAMFER2_SIZE * 0.999621916911), (0, 0), align=None)
    chamfer2_piece_8a = extrude(amount=7.571683, mode=Mode.PRIVATE)
    chamfer2_piece_8a = split(chamfer2_piece_8a, bisect_by=Plane(origin=(7.5, 124.670206, -2.829794), z_dir=(-1, 0, 0)), keep=Keep.TOP, mode=Mode.PRIVATE)
    with BuildSketch(Plane(origin=(7.5, 125, -5.071683), x_dir=(-0.999621916911297, 0.027495876610582174, 0), z_dir=(0, 0, 1))) as chamfer2_piece_8b_section:
        Polygon((CHAMFER2_SIZE * 0.999621916911, CHAMFER2_SIZE * 0.0274958766106), (-CHAMFER2_SIZE * 0.0274958766106, CHAMFER2_SIZE * 0.999621916911), (0, 0), align=None)
    chamfer2_piece_8b = extrude(amount=7.571683, mode=Mode.PRIVATE)
    chamfer2_piece_8b = split(chamfer2_piece_8b, bisect_by=Plane(origin=(7.170206, 124.670206, -2.5), z_dir=(0, 0, -1)), keep=Keep.TOP, mode=Mode.PRIVATE)
    chamfer2_piece_8 = chamfer2_piece_8a & chamfer2_piece_8b
    add(chamfer2_piece_8, mode=Mode.SUBTRACT)
    with BuildSketch(Plane(origin=(7.5, 125, -2.5), x_dir=(-0.999621916911297, 0.027495876610582174, 0), z_dir=(0, 0, 1))) as chamfer2_piece_9a_section:
        Polygon((CHAMFER2_SIZE * 0.999621916911, CHAMFER2_SIZE * 0.0274958766106), (-CHAMFER2_SIZE * 0.0274958766106, CHAMFER2_SIZE * 0.999621916911), (0, 0), align=None)
    chamfer2_piece_9a = extrude(amount=7.571683, mode=Mode.PRIVATE)
    chamfer2_piece_9a = split(chamfer2_piece_9a, bisect_by=Plane(origin=(7.170206, 124.670206, 2.5), z_dir=(0, 0, 1)), keep=Keep.TOP, mode=Mode.PRIVATE)
    with BuildSketch(Plane(origin=(4.928317, 125, 2.5), x_dir=(0, 0.02749587661058217, 0.9996219169112968), z_dir=(1, 0, 0))) as chamfer2_piece_9b_section:
        Polygon((CHAMFER2_SIZE * 0.999621916911, CHAMFER2_SIZE * 0.0274958766106), (-CHAMFER2_SIZE * 0.0274958766106, CHAMFER2_SIZE * 0.999621916911), (0, 0), align=None)
    chamfer2_piece_9b = extrude(amount=7.571683, mode=Mode.PRIVATE)
    chamfer2_piece_9b = split(chamfer2_piece_9b, bisect_by=Plane(origin=(7.5, 124.670206, 2.829794), z_dir=(-1, 0, 0)), keep=Keep.TOP, mode=Mode.PRIVATE)
    chamfer2_piece_9 = chamfer2_piece_9a & chamfer2_piece_9b
    add(chamfer2_piece_9, mode=Mode.SUBTRACT)
    with BuildSketch(Plane(origin=(12.5, 125, 5.071683), x_dir=(0.999621916911297, 0.0274958766105822, 0), z_dir=(0, 0, -1))) as chamfer2_piece_10a_section:
        Polygon((CHAMFER2_SIZE * 0.999621916911, CHAMFER2_SIZE * 0.0274958766106), (-CHAMFER2_SIZE * 0.0274958766106, CHAMFER2_SIZE * 0.999621916911), (0, 0), align=None)
    chamfer2_piece_10a = extrude(amount=7.571683, mode=Mode.PRIVATE)
    chamfer2_piece_10a = split(chamfer2_piece_10a, bisect_by=Plane(origin=(12.829794, 124.670206, 2.5), z_dir=(0, 0, 1)), keep=Keep.TOP, mode=Mode.PRIVATE)
    with BuildSketch(Plane(origin=(7.5, 125, 2.5), x_dir=(0, 0.02749587661058217, 0.9996219169112968), z_dir=(1, 0, 0))) as chamfer2_piece_10b_section:
        Polygon((CHAMFER2_SIZE * 0.999621916911, CHAMFER2_SIZE * 0.0274958766106), (-CHAMFER2_SIZE * 0.0274958766106, CHAMFER2_SIZE * 0.999621916911), (0, 0), align=None)
    chamfer2_piece_10b = extrude(amount=7.571683, mode=Mode.PRIVATE)
    chamfer2_piece_10b = split(chamfer2_piece_10b, bisect_by=Plane(origin=(12.5, 124.670206, 2.829794), z_dir=(1, 0, 0)), keep=Keep.TOP, mode=Mode.PRIVATE)
    chamfer2_piece_10 = chamfer2_piece_10a & chamfer2_piece_10b
    add(chamfer2_piece_10, mode=Mode.SUBTRACT)


solid = part.part
